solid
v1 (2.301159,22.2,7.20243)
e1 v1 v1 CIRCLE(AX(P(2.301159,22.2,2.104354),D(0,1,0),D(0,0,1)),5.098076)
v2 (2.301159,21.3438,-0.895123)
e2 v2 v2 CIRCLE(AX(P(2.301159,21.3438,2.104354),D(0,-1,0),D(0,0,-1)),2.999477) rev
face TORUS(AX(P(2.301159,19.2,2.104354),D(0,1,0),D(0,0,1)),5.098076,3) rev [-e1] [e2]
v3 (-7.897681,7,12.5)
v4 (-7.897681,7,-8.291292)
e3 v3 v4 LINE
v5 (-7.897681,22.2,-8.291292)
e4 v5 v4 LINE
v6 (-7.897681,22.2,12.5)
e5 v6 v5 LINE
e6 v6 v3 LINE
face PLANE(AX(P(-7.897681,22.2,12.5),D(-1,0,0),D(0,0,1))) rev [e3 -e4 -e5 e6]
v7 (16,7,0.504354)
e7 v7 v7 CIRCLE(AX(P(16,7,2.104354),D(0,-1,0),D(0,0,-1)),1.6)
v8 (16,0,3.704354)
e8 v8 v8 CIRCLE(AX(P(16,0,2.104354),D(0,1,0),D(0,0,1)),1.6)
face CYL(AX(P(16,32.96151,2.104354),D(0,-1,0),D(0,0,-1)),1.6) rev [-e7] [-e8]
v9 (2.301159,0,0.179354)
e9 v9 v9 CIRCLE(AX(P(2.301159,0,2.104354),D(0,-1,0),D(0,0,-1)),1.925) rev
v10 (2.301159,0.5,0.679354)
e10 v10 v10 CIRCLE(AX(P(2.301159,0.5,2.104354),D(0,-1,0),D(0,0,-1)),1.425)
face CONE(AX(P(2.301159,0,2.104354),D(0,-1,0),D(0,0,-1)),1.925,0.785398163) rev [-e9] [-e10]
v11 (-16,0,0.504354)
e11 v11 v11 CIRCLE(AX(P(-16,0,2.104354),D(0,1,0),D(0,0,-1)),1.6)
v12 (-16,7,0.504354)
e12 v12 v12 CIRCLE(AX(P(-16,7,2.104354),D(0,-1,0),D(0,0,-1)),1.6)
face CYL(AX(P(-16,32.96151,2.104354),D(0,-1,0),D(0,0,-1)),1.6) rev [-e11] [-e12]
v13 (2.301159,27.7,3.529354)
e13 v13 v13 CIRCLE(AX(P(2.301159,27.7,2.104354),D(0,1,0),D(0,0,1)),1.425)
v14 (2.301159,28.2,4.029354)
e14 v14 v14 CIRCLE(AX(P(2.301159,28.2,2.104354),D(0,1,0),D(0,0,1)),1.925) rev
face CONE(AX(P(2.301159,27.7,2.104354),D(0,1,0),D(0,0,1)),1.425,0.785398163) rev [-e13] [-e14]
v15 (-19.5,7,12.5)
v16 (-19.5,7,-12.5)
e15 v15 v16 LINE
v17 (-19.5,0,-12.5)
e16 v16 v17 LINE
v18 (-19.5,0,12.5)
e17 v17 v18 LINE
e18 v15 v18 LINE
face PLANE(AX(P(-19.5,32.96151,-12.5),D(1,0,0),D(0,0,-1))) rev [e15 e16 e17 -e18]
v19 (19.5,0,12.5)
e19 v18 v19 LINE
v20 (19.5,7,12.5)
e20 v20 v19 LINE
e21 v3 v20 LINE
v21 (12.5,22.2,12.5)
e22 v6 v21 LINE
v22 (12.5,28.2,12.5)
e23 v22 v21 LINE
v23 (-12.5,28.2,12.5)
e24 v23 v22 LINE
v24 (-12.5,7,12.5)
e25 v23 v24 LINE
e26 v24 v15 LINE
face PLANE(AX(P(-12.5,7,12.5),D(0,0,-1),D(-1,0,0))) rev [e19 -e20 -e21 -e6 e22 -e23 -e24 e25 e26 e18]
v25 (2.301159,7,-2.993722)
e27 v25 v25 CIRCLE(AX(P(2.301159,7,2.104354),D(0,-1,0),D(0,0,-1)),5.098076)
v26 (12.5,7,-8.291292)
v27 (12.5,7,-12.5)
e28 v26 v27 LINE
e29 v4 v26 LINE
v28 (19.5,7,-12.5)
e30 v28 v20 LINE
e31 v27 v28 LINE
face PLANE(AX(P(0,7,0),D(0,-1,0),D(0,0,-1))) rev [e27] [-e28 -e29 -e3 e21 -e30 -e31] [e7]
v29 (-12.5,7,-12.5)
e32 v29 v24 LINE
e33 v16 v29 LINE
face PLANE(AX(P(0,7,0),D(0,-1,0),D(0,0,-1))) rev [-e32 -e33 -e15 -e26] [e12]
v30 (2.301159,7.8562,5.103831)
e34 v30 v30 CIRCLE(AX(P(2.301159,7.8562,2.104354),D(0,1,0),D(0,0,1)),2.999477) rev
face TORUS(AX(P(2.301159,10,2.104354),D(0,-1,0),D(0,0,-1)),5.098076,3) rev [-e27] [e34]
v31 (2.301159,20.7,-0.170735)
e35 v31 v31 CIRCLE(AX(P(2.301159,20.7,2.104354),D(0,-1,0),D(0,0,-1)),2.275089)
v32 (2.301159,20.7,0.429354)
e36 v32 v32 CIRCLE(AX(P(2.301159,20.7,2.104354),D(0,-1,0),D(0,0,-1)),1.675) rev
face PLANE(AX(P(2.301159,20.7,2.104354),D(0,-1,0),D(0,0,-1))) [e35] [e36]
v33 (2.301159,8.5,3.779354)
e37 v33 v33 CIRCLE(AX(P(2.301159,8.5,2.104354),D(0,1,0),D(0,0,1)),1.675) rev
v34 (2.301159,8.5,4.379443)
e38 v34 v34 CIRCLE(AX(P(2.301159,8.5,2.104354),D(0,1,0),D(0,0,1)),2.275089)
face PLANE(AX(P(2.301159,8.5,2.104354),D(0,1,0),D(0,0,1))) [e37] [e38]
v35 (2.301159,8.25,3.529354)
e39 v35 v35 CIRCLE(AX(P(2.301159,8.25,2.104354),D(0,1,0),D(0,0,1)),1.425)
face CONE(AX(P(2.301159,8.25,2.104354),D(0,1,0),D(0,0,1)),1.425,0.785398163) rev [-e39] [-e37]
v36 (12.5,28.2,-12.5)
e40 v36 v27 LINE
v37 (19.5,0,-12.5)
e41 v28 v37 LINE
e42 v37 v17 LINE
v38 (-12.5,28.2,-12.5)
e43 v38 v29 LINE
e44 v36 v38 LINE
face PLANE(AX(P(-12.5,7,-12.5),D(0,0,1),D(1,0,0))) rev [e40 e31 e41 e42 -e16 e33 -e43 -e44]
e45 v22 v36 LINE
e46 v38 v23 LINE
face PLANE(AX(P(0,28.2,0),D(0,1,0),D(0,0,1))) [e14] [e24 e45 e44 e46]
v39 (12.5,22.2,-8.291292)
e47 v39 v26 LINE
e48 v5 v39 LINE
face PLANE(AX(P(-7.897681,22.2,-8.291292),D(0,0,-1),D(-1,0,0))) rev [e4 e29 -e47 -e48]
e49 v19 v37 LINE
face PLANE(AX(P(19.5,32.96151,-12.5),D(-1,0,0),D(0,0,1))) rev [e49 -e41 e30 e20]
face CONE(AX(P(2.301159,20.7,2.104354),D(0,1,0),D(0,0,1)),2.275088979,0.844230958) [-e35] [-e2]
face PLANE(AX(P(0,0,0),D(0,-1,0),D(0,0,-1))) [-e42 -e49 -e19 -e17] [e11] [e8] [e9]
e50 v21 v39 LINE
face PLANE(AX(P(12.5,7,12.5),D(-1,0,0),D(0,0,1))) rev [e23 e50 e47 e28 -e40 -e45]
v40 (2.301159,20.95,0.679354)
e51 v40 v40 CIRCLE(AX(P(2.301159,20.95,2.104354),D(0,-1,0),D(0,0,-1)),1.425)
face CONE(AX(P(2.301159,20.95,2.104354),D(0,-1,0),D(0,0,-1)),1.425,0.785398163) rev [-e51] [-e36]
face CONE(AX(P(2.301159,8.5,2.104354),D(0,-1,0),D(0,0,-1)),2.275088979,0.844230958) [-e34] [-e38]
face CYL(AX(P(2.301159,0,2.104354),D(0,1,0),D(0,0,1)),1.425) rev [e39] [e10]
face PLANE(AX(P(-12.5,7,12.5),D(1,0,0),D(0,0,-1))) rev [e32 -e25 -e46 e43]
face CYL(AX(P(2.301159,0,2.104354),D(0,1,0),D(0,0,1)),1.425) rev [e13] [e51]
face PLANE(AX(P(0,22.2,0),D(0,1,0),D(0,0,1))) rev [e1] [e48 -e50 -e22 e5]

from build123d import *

# Parameters (mm, degrees)
SKETCH1_W               = 25
SKETCH1_H               = 25
BOSS_EXTRUDE1_DEPTH     = 7
BOSS_EXTRUDE2_DEPTH     = 15.2
SKETCH3_W               = 25
SKETCH3_H               = 25
BOSS_EXTRUDE3_DEPTH     = 6
CUT_EXTRUDE1_DEPTH      = 28.603260677
CUT_EXTRUDE1_DEPTH_BACK = 28.603260677
SKETCH4_R               = 1.425
SKETCH5_R               = 2.5
SKETCH5_R_2             = 1.425
BOSS_EXTRUDE4_DEPTH     = 1.5
BOSS_EXTRUDE5_START     = 1.5
SKETCH6_R               = 2.5
SKETCH6_R_2             = 1.425
BOSS_EXTRUDE5_DEPTH     = 1.5
FILLET1_R               = 3
CHAMFER2_SIZE           = 0.25
CHAMFER3_SIZE           = 0.5
SKETCH8_W               = 7
SKETCH8_H               = 25
SKETCH8_R               = 1.6
BOSS_EXTRUDE6_DEPTH     = 7


with BuildPart() as part:
    # Sketch1 → Boss-Extrude1 (new body)
    with BuildSketch(Plane(origin=(0, 0, 0), x_dir=(1, 0, 0), z_dir=(0, 1, 0))):
        Rectangle(SKETCH1_W, SKETCH1_H)
    extrude(amount=BOSS_EXTRUDE1_DEPTH)

    # Sketch2 → Boss-Extrude2 (add)
    with BuildSketch(Plane(origin=(0, 7, 0), x_dir=(1, 0, 0), z_dir=(0, 1, 0))):
        Polygon((-12.5, -12.5), (-7.897681384, -12.5), (-7.897681384, 8.291292288), (12.5, 8.291292288), (12.5, 12.5), (-12.5, 12.5), align=None)
    extrude(amount=BOSS_EXTRUDE2_DEPTH)

    # Sketch3 → Boss-Extrude3 (add)
    with BuildSketch(Plane(origin=(0, 22.2, 0), x_dir=(1, 0, 0), z_dir=(0, 1, 0))):
        Rectangle(SKETCH3_W, SKETCH3_H)
    extrude(amount=BOSS_EXTRUDE3_DEPTH)

    # Sketch4 → Cut-Extrude1 (cut, two sides: drawn at the far end of the back side and taken through both)
    with BuildSketch(Plane(origin=(0, 7, 0), x_dir=(1, 0, 0), z_dir=(0, 1, 0)).offset(-CUT_EXTRUDE1_DEPTH_BACK)):
        with Locations(Location((2.301159308, -2.104353856, 0), (0, 0, 270))):
            Circle(SKETCH4_R)
    extrude(amount=CUT_EXTRUDE1_DEPTH + CUT_EXTRUDE1_DEPTH_BACK, mode=Mode.SUBTRACT)

    # Sketch5 → Boss-Extrude4 (add)
    with BuildSketch(Plane(origin=(0, 7, 0), x_dir=(1, 0, 0), z_dir=(0, 1, 0))):
        with Locations(Location((2.301159308, -2.104353856, 0), (0, 0, 90))):
            Circle(SKETCH5_R)
        with Locations(Location((2.301159308, -2.104353856, 0), (0, 0, 270))):
            Circle(SKETCH5_R_2, mode=Mode.SUBTRACT)
    extrude(amount=BOSS_EXTRUDE4_DEPTH)

    # Sketch6 → Boss-Extrude5 (add)
    with BuildSketch(Plane.XZ.offset(-22.2).offset(BOSS_EXTRUDE5_START)):
        with Locations(Location((2.301159308, 2.104353856, 0), (0, 0, 270))):
            Circle(SKETCH6_R)
        with Locations(Location((2.301159308, 2.104353856, 0), (0, 0, 90))):
            Circle(SKETCH6_R_2, mode=Mode.SUBTRACT)
    extrude(amount=-BOSS_EXTRUDE5_DEPTH)

    # Fillet1
    # the kernel refuses this fillet: 3 mm, written as the material it adds along each edge
    with BuildSketch(Plane(origin=(2.301159308, 7, 2.104353856), x_dir=(0, 0, -1), z_dir=(1, 0, 0))) as fillet1_piece_1:
        with BuildLine():
            CenterArc((5.098076211, 3), FILLET1_R, 210, 60)
            Line((2.5, 1.5), (2.448038476, 1.47))
            ThreePointArc((2.448038476, 1.47), (2.44, 0.75), (2.44, 0))
            Line((2.44, 0), (2.5, -0.06))
            Line((2.5, -0.06), (5.098076211, -0.06))
            Line((5.098076211, -0.06), (5.098076211, 0))
        make_face()
    revolve(axis=Axis((2.301159308, 7, 2.104353856), (0, 1, 0)))
    with BuildSketch(Plane(origin=(2.301159308, 22.2, 2.104353856), x_dir=(0, 0, -1), z_dir=(-1, 0, 0))) as fillet1_piece_2:
        with BuildLine():
            CenterArc((5.098076211, 3), FILLET1_R, 210, 60)
            Line((2.5, 1.5), (2.448038476, 1.47))
            ThreePointArc((2.448038476, 1.47), (2.44, 0.75), (2.44, 0))
            Line((2.44, 0), (2.5, -0.06))
            Line((2.5, -0.06), (5.098076211, -0.06))
            Line((5.098076211, -0.06), (5.098076211, 0))
        make_face()
    revolve(axis=Axis((2.301159308, 22.2, 2.104353856), (0, -1, 0)))

    # Chamfer1
    # the kernel refuses this chamfer: 1, 0.396795558 mm, written as the material it takes off along each edge
    with BuildSketch(Plane(origin=(2.301159308, 8.5, 2.104353856), x_dir=(0, 0, -1), z_dir=(1, 0, 0))) as chamfer1_piece_1:
        with BuildLine():
            Line((2.245190561, 0.026572252), (3.029375179, -0.670372697))
            Line((3.029375179, -0.670372697), (3.043365842, -0.656080694))
            ThreePointArc((3.043365842, -0.656080694), (2.755730305, -0.342231162), (2.517320508, 0.01))
            Line((2.517320508, 0.01), (2.5, 0.02))
            ThreePointArc((2.5, 0.02), (2.37259528, 0.02), (2.245190561, 0.046572252))
            Line((2.245190561, 0.046572252), (2.245190561, 0.026572252))
        make_face()
    revolve(axis=Axis((2.301159308, 8.5, 2.104353856), (0, 1, 0)), mode=Mode.SUBTRACT)
    with BuildSketch(Plane(origin=(2.301159308, 20.7, 2.104353856), x_dir=(0, 0, -1), z_dir=(-1, 0, 0))) as chamfer1_piece_2:
        with BuildLine():
            Line((3.029375179, -0.670372697), (2.245190561, 0.026572252))
            Line((2.245190561, 0.026572252), (2.245190561, 0.046572252))
            ThreePointArc((2.245190561, 0.046572252), (2.37259528, 0.02), (2.5, 0.02))
            Line((2.5, 0.02), (2.517320508, 0.01))
            ThreePointArc((2.517320508, 0.01), (2.755730305, -0.342231162), (3.043365842, -0.656080694))
            Line((3.043365842, -0.656080694), (3.029375179, -0.670372697))
        make_face()
    revolve(axis=Axis((2.301159308, 20.7, 2.104353856), (0, -1, 0)), mode=Mode.SUBTRACT)

    # Chamfer2
    chamfer2_edges = [part.edges().sort_by_distance(p)[0] for p in [
        (2.301159308, 8.5, 0.679353856),
        (2.301159308, 20.7, 0.679353856),
    ]]
    chamfer(chamfer2_edges, length=CHAMFER2_SIZE)

    # Chamfer3
    chamfer3_edges = [part.edges().sort_by_distance(p)[0] for p in [
        (2.301159308, 0, 0.679353856),
        (2.301159308, 28.2, 0.679353856),
    ]]
    chamfer(chamfer3_edges, length=CHAMFER3_SIZE)

    # Sketch8 → Boss-Extrude6 (add)
    # profile 1 of 2: a face of its own
    with BuildSketch(Plane(origin=(0, 0, 0), x_dir=(1, 0, 0), z_dir=(0, 1, 0))):
        with Locations((16, 0)):
            Rectangle(SKETCH8_W, SKETCH8_H)
        with Locations(Location((16, -2.104353856, 0), (0, 0, 90))):
            Circle(SKETCH8_R, mode=Mode.SUBTRACT)
    # profile 2 of 2: a face of its own
    with BuildSketch(Plane(origin=(0, 0, 0), x_dir=(1, 0, 0), z_dir=(0, 1, 0))):
        with Locations((-16, 0)):
            Rectangle(SKETCH8_W, SKETCH8_H)
        with Locations(Location((-16, -2.104353856, 0), (0, 0, 90))):
            Circle(SKETCH8_R, mode=Mode.SUBTRACT)
    extrude(amount=BOSS_EXTRUDE6_DEPTH)


solid = part.part
